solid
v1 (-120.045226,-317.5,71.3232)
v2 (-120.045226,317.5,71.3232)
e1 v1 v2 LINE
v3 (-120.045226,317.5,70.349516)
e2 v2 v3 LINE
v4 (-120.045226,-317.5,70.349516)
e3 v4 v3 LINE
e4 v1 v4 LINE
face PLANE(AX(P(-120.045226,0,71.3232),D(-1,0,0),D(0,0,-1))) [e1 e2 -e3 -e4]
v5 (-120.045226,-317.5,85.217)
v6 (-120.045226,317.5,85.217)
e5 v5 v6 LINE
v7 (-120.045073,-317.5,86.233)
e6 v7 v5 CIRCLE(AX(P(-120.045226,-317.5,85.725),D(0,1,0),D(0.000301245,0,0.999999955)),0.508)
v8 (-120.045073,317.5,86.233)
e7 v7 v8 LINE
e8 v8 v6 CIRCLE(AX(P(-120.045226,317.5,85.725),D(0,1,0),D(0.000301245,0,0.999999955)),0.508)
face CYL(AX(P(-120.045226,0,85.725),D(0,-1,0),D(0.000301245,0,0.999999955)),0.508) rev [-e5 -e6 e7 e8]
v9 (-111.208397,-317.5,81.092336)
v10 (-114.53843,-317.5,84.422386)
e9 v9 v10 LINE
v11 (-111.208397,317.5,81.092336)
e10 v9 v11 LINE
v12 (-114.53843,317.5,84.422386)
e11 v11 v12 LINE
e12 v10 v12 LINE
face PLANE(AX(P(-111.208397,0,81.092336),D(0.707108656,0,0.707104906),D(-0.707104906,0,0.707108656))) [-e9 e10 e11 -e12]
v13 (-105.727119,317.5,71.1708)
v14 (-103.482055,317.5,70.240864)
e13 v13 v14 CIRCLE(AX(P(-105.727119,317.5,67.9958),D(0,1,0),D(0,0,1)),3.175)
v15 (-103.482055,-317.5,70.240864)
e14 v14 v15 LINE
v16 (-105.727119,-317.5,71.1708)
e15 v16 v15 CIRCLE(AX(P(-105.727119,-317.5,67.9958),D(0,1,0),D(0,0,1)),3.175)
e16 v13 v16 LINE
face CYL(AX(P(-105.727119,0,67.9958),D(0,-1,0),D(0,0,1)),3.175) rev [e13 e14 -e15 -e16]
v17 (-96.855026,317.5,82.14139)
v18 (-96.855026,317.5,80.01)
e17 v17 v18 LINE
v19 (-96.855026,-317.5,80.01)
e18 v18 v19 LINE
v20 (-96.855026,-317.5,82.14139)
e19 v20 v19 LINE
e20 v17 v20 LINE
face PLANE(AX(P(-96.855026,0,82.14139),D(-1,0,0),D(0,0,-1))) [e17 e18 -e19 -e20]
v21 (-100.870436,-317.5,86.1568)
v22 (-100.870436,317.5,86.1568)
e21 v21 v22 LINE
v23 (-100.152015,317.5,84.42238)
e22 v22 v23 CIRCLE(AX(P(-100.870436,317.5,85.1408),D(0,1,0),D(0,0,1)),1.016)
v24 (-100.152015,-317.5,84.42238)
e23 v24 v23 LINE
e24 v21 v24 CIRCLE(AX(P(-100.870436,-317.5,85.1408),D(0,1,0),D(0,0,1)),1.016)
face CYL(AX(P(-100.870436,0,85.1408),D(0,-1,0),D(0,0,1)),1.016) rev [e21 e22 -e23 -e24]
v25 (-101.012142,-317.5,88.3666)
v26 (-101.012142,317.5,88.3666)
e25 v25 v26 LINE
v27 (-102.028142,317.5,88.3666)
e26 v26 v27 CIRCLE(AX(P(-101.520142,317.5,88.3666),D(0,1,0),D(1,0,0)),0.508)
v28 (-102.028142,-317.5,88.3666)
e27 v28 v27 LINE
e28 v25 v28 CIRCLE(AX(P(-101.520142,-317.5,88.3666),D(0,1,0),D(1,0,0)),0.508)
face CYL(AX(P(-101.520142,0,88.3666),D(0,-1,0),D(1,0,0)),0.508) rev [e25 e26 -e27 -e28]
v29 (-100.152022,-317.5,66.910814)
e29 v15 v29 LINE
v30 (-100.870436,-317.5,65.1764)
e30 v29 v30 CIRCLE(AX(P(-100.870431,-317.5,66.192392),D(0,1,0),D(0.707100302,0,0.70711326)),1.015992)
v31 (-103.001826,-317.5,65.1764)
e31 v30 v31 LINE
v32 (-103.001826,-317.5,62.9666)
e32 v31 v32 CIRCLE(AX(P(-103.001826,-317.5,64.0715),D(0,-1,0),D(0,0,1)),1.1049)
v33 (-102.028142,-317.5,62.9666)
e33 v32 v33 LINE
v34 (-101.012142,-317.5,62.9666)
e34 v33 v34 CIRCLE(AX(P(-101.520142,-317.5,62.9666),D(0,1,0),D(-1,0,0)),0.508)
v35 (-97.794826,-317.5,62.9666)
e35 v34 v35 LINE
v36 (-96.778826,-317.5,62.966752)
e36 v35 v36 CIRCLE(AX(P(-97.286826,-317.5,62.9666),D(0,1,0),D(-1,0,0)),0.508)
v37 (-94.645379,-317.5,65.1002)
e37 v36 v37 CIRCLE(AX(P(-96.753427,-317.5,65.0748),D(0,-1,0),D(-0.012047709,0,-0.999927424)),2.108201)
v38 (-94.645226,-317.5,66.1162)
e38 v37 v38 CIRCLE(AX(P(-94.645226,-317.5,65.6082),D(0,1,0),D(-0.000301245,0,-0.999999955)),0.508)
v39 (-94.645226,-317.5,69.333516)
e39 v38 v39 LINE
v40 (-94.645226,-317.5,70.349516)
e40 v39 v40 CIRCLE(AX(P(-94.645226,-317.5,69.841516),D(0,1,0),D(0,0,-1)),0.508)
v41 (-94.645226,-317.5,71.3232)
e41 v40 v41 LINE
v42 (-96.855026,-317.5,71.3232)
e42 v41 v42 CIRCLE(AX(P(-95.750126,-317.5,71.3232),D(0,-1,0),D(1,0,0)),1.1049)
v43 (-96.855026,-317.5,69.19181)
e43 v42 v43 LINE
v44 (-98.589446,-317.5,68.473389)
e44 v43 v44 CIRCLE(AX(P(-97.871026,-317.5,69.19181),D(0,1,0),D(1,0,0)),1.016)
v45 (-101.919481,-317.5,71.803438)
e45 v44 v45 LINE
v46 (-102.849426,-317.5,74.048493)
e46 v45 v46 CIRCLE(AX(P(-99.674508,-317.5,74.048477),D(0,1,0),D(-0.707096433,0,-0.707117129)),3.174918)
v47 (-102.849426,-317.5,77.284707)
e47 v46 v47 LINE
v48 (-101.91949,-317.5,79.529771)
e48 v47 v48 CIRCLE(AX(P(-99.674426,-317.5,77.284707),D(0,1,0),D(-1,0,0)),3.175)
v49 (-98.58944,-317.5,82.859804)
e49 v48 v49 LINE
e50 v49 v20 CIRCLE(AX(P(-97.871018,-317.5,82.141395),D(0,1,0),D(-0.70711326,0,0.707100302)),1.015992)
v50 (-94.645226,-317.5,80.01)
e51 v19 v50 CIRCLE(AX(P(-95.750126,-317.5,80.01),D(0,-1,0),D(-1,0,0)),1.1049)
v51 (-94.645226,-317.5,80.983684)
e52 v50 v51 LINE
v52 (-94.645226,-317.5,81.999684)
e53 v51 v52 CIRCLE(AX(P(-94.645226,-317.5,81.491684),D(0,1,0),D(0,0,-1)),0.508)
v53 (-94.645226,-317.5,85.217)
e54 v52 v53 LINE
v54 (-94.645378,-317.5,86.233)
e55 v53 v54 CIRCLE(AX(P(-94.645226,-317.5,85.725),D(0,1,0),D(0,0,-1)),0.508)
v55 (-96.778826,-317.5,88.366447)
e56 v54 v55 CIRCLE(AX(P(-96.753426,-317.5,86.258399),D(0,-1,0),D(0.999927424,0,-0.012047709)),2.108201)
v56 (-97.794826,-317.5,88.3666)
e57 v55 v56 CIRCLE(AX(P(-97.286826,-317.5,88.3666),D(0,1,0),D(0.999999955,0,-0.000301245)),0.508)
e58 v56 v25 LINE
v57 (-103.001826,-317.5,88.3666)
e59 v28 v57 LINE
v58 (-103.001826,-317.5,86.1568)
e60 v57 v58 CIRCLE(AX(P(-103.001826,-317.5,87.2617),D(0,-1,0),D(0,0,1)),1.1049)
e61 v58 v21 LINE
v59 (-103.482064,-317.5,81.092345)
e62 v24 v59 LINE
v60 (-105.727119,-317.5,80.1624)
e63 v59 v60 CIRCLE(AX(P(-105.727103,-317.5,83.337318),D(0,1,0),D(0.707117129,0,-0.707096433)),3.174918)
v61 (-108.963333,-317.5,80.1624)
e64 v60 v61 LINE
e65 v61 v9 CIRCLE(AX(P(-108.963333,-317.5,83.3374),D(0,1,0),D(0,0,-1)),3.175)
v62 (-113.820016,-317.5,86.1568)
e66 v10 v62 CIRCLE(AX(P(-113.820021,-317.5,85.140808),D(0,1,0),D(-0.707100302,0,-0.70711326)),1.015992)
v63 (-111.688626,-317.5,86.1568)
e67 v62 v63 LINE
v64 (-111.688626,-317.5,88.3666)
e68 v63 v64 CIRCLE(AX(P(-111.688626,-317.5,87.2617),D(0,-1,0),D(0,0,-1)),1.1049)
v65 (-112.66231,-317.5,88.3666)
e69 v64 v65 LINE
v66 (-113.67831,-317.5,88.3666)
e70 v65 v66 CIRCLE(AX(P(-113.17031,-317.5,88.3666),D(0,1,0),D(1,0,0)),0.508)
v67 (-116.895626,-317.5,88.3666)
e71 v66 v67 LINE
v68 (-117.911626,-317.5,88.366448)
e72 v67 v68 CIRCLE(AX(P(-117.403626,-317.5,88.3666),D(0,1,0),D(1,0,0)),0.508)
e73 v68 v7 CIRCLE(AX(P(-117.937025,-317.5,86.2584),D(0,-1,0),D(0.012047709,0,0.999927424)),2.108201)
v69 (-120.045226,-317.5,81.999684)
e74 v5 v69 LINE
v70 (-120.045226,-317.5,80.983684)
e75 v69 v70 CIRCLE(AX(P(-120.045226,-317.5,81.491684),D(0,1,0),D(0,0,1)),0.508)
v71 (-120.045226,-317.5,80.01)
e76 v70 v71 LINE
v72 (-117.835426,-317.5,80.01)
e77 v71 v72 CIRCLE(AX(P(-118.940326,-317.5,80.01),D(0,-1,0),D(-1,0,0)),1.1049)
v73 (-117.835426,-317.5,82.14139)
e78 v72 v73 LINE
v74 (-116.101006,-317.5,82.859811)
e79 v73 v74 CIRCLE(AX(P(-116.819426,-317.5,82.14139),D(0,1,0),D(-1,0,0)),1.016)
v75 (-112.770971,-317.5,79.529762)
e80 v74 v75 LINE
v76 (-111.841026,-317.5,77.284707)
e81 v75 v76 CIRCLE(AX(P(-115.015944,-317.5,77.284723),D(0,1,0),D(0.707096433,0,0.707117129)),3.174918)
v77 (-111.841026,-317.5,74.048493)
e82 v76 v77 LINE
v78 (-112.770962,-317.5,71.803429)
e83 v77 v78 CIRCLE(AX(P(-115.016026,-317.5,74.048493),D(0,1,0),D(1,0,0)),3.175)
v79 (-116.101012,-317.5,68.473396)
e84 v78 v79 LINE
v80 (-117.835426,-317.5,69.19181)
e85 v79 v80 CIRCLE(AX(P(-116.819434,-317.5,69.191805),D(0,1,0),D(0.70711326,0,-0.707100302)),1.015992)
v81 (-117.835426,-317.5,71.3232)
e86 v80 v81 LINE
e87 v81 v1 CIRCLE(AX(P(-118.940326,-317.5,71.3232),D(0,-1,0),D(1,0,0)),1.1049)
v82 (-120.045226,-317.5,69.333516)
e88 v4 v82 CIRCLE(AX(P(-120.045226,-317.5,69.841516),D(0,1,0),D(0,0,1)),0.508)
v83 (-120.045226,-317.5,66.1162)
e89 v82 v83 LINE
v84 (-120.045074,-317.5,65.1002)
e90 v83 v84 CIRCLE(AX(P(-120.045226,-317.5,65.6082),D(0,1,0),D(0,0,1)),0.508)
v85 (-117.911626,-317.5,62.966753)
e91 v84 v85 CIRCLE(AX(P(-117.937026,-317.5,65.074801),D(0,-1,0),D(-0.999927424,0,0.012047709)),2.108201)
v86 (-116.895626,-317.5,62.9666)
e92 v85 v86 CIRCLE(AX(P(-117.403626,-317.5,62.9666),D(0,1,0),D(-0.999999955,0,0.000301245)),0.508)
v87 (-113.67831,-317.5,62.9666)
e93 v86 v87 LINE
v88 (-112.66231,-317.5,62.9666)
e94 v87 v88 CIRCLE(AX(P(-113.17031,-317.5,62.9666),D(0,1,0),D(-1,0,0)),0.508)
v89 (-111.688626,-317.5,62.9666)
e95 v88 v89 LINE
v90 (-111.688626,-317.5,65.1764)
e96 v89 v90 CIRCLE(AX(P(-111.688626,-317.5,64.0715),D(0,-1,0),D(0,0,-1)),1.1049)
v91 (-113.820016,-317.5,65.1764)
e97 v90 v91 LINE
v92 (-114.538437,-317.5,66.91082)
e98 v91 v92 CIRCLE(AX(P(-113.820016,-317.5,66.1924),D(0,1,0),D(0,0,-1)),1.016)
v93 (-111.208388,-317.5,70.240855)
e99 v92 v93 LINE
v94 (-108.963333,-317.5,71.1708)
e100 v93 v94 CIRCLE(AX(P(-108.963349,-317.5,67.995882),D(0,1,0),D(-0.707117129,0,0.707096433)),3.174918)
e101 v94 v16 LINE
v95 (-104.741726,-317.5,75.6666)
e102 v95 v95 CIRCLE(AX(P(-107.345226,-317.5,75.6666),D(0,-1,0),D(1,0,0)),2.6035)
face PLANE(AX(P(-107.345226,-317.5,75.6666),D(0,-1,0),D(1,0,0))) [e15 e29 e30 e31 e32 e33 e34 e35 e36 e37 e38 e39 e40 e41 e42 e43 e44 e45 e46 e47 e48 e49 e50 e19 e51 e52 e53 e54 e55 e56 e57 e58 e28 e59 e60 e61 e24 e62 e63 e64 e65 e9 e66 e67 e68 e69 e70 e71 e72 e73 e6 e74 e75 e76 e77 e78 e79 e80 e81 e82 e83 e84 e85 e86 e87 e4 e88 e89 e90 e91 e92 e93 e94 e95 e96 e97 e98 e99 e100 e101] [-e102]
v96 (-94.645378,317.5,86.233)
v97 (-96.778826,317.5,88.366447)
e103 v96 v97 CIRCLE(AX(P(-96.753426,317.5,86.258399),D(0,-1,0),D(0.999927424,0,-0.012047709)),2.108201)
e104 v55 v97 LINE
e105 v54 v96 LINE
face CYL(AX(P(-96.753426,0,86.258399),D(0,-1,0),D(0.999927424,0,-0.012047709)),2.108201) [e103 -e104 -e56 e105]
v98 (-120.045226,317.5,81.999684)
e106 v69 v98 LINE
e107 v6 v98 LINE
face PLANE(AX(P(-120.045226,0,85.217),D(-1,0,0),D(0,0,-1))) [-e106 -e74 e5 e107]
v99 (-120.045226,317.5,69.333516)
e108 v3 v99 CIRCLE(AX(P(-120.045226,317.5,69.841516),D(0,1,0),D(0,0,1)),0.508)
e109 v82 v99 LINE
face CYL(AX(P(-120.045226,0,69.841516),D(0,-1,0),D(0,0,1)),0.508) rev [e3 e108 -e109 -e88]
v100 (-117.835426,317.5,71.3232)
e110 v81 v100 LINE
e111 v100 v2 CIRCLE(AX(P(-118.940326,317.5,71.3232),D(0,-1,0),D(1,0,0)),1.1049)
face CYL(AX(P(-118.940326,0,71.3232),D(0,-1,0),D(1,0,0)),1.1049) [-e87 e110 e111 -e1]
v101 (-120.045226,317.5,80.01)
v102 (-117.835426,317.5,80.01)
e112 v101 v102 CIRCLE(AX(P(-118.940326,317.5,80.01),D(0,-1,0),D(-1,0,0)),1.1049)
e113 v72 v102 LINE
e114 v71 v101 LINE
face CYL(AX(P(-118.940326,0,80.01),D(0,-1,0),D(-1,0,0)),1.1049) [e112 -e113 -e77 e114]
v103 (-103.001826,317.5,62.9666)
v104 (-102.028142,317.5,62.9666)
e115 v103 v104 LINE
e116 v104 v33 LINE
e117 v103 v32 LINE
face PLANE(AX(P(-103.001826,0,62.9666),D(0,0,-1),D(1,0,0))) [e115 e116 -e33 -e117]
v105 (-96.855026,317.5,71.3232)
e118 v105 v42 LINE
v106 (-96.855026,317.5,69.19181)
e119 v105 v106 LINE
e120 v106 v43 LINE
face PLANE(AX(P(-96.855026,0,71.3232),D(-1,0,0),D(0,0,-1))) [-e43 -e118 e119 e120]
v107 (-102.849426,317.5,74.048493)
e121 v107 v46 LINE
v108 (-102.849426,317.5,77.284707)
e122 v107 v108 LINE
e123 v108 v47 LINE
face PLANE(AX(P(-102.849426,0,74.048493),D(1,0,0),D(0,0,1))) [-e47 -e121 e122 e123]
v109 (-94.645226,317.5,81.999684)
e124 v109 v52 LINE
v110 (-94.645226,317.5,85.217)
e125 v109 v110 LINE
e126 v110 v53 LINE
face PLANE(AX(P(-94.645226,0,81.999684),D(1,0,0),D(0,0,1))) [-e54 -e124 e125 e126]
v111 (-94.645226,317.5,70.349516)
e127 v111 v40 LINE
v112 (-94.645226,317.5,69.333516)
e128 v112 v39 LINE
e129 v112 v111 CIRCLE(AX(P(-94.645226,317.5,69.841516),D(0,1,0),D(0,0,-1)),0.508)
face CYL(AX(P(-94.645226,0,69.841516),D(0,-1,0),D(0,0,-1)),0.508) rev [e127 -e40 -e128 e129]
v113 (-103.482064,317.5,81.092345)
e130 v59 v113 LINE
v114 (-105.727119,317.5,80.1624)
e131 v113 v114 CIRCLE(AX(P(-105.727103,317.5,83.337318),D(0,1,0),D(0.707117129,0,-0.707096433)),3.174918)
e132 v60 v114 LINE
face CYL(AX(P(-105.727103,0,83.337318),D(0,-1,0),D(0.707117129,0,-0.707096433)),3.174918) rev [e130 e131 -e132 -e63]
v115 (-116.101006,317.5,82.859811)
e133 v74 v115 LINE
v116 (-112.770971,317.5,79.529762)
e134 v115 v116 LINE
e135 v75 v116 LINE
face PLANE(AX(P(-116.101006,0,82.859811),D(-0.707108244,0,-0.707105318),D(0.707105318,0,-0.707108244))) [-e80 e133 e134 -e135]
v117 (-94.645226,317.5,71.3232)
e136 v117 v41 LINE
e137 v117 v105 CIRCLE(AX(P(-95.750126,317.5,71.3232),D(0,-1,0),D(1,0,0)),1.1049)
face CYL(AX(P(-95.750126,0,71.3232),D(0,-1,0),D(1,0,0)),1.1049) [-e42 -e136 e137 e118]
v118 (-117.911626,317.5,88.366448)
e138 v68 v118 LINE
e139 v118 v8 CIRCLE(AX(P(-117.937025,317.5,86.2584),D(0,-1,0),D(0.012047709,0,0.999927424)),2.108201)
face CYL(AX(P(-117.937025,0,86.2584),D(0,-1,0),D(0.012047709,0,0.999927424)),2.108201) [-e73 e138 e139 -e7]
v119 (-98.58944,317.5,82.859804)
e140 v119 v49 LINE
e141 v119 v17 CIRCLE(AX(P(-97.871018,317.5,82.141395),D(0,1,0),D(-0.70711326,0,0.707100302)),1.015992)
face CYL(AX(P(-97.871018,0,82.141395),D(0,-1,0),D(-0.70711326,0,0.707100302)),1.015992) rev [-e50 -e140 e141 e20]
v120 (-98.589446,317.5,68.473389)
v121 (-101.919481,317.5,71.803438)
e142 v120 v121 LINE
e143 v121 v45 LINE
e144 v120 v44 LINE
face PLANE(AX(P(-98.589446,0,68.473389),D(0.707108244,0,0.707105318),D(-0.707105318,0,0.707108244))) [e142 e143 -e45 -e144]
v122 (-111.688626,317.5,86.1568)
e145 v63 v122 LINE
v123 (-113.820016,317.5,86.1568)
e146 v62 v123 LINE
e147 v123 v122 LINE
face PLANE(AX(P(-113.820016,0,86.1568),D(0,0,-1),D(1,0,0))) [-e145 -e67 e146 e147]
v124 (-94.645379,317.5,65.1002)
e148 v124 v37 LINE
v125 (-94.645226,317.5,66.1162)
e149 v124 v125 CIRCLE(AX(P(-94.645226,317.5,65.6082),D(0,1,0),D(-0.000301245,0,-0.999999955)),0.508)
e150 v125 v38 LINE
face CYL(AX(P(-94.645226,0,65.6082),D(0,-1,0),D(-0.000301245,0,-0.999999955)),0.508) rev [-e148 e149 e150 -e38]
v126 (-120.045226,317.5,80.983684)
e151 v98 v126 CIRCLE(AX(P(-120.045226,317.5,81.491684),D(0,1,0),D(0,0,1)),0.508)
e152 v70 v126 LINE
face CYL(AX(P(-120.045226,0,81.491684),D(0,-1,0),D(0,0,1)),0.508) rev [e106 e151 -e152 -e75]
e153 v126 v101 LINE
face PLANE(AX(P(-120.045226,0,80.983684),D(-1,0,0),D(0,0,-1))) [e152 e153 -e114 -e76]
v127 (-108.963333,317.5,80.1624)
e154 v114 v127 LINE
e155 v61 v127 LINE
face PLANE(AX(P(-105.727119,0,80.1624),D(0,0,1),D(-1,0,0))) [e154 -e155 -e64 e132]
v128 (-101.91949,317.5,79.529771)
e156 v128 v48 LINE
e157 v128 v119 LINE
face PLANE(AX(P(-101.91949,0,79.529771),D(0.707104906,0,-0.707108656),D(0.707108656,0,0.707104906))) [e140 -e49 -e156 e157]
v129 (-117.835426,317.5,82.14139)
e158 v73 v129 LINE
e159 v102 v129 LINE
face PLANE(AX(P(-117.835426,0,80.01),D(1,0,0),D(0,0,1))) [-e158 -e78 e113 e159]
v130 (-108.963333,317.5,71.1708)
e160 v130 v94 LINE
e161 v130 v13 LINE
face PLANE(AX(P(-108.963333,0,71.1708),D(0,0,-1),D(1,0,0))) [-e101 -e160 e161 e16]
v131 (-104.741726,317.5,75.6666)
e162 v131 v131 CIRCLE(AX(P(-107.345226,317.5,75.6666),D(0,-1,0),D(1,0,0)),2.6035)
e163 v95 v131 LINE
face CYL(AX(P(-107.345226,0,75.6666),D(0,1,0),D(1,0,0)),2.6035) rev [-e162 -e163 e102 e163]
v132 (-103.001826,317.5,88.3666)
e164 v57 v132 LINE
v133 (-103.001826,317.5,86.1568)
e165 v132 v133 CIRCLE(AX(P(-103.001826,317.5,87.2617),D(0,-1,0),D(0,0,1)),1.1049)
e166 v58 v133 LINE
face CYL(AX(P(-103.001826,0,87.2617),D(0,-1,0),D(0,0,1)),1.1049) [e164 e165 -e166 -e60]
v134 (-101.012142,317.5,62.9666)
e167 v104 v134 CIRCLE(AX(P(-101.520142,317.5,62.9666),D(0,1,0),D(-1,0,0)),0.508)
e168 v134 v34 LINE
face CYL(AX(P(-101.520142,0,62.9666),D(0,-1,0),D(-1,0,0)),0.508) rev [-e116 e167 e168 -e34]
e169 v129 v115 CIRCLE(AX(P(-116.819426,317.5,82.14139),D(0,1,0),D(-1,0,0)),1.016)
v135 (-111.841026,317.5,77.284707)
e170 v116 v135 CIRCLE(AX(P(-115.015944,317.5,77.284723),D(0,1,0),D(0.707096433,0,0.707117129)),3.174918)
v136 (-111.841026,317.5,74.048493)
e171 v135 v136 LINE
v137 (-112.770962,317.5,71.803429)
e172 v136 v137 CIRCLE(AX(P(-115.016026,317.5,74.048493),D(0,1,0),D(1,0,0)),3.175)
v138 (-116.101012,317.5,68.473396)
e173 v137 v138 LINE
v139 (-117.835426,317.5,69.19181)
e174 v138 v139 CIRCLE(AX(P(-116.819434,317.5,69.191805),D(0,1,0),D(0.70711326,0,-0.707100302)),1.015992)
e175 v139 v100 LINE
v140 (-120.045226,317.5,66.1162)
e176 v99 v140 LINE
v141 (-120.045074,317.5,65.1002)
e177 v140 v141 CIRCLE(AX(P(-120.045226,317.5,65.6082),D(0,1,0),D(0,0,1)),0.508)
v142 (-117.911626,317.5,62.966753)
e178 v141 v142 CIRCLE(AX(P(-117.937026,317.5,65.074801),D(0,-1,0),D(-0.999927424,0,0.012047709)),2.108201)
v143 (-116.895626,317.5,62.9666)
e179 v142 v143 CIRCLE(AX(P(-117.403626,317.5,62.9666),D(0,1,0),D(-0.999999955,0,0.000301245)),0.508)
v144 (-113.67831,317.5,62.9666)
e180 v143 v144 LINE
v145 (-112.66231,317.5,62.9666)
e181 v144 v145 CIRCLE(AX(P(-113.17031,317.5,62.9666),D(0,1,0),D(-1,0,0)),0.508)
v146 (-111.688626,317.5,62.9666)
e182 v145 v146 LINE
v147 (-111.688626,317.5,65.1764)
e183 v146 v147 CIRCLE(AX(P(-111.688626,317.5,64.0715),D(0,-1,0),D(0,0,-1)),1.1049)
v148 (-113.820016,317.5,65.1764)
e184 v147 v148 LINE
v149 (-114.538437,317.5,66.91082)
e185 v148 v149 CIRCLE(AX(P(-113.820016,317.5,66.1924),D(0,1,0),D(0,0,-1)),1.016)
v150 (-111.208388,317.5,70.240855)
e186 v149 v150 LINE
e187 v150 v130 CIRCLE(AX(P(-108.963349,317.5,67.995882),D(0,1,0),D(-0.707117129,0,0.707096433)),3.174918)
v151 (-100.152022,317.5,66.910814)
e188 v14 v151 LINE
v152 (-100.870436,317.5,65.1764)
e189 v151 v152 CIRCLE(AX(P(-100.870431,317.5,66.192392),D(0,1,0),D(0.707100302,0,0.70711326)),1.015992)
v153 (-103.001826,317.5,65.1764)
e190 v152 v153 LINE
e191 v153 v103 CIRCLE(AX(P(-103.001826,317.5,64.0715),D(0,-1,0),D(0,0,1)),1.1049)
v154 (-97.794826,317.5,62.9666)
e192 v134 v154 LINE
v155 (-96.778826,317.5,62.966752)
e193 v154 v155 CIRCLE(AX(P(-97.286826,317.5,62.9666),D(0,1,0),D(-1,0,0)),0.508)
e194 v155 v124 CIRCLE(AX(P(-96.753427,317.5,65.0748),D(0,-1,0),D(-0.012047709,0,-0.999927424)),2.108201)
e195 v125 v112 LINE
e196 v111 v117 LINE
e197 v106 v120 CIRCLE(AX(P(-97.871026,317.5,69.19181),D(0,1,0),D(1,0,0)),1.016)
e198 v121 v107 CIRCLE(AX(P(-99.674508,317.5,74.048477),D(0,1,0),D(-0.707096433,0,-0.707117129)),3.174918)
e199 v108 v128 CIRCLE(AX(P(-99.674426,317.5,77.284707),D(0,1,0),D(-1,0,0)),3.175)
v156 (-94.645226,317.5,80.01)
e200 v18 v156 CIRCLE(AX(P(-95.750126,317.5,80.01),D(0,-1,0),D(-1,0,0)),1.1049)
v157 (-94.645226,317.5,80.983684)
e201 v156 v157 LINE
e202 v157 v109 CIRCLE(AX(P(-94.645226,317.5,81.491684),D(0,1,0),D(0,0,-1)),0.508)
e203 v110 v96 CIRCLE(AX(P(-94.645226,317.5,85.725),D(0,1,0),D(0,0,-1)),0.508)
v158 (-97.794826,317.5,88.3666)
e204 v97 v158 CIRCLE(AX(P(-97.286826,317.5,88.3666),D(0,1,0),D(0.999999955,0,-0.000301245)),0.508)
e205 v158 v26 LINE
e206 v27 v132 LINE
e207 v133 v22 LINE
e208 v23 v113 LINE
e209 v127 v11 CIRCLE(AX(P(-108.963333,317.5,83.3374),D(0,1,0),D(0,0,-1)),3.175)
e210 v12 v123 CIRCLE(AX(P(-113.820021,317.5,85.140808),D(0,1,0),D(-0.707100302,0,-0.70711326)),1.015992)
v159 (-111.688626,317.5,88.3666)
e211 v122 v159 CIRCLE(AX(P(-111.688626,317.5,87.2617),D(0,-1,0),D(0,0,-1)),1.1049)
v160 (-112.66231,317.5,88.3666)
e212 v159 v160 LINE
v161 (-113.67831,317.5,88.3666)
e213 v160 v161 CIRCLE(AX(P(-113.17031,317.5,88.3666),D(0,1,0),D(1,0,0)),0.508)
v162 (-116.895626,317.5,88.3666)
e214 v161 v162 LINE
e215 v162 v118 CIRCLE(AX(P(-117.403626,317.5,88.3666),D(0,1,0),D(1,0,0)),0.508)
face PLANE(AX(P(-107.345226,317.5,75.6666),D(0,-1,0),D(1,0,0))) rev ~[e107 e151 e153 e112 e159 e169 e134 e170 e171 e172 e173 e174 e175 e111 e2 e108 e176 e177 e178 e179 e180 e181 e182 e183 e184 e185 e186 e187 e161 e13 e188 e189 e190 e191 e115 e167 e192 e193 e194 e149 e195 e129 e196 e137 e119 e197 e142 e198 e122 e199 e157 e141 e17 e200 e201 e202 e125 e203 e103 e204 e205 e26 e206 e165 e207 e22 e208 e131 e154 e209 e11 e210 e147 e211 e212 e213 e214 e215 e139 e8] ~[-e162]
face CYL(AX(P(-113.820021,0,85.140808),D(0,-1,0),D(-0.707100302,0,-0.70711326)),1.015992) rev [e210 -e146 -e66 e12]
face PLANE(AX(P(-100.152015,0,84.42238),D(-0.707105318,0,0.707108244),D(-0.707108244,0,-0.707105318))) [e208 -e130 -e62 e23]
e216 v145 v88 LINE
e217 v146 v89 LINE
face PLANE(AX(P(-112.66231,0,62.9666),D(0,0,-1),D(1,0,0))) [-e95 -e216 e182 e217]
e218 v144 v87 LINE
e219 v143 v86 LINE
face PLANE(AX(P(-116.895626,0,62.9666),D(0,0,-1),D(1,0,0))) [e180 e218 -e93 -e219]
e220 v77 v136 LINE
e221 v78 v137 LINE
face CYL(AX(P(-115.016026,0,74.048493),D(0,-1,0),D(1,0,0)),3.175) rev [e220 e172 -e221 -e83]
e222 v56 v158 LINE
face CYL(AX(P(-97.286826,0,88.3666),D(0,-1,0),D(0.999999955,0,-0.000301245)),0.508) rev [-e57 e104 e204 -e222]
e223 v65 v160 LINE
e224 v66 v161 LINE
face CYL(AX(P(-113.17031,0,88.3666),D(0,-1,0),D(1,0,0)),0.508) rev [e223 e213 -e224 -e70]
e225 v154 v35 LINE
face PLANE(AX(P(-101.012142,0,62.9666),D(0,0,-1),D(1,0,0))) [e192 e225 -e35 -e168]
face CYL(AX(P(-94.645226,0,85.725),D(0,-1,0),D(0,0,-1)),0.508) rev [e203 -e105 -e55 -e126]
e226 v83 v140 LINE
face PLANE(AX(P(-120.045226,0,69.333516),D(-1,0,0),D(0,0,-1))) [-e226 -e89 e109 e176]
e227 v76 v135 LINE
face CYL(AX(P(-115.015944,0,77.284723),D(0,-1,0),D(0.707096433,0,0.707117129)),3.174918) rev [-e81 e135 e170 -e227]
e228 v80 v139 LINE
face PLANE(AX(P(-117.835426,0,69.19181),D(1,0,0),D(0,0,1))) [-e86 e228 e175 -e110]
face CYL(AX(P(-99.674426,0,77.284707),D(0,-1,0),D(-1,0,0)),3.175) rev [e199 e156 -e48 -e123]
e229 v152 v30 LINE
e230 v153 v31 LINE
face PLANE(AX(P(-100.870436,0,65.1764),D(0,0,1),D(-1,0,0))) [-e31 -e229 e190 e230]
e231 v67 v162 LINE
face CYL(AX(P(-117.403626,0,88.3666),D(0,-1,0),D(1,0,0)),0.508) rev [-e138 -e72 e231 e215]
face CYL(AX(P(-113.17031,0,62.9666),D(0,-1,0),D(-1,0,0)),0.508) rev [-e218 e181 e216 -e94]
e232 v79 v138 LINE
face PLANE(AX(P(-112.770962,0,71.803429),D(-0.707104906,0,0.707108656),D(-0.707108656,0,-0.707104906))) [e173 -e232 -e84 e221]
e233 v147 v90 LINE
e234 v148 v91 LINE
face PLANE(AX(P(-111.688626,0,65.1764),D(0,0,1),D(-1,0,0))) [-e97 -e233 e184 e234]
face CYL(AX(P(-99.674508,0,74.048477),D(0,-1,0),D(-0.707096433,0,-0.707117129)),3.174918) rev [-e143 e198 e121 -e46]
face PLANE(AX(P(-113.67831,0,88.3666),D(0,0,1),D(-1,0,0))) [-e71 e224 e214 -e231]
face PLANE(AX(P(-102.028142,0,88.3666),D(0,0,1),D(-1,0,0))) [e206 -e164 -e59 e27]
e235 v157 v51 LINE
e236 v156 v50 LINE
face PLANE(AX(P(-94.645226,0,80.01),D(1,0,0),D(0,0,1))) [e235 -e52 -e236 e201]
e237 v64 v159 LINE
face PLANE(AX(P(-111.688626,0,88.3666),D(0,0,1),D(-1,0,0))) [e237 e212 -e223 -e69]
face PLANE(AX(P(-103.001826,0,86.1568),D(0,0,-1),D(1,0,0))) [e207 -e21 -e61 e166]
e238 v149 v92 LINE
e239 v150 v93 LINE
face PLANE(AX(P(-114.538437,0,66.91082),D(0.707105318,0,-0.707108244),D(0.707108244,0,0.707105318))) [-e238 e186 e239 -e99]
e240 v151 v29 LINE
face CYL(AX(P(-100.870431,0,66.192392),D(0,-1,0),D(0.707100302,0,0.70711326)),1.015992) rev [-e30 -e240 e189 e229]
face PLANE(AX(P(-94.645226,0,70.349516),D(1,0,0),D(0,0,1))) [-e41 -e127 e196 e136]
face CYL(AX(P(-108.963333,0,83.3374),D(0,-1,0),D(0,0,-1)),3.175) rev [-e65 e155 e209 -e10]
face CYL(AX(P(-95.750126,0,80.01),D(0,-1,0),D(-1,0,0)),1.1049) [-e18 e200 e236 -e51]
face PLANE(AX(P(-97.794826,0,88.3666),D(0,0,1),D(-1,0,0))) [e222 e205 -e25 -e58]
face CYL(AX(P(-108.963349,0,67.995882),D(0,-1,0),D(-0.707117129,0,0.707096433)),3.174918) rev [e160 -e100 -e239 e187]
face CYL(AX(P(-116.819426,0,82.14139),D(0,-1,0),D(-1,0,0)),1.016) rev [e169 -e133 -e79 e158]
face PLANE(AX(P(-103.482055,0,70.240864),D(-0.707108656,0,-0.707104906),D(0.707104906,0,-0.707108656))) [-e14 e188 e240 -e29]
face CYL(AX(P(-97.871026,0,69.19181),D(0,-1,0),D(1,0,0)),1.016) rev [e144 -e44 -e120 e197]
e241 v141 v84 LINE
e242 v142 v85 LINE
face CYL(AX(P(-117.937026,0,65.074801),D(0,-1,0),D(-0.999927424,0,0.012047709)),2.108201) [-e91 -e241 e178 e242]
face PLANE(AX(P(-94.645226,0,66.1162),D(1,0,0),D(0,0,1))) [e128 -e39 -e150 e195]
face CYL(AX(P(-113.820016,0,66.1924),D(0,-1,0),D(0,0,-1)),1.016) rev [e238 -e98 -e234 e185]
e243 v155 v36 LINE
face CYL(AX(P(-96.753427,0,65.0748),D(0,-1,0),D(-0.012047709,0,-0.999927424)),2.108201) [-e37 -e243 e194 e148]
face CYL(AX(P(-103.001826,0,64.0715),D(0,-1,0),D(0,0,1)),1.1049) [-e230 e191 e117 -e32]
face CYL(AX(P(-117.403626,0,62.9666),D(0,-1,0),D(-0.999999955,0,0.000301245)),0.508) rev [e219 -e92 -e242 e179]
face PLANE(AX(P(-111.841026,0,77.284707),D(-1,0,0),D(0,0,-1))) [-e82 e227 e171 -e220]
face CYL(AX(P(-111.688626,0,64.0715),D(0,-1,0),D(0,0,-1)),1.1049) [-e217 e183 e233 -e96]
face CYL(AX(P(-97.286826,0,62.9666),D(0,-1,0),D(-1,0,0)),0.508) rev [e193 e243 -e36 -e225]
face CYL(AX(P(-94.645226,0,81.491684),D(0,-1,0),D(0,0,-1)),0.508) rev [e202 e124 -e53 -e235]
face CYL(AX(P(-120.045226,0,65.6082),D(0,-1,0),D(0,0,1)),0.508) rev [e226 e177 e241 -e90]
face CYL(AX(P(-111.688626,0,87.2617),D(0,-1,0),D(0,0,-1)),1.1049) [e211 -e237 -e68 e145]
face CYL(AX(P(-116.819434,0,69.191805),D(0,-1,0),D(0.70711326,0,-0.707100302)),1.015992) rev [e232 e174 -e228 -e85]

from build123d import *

# Parameters (mm, degrees)
F0_R     = 2.6035
F1_DEPTH = 317.5


# Not quite as in the source:
# - ends of sketch curves that miss each other by under 0.0002 mm in the source are joined


with BuildPart() as f1:
    # F0 (on Front) → F1 (new body, symmetric)
    with BuildSketch(Plane.XZ):
        with BuildLine():
            ThreePointArc((-120.045226, 66.1162), (-119.5372260057, 65.6082762), (-120.0450736, 65.1002000229))
            ThreePointArc((-120.0450736, 65.1002000229), (-119.4277485161, 63.5840774839), (-117.9116260074, 62.9667530175))
            ThreePointArc((-117.9116260074, 62.9667530175), (-117.4035498, 63.4745999943), (-116.895626, 62.9666))
            Line((-116.895626, 62.9666), (-113.6783096, 62.9666))
            ThreePointArc((-113.6783096, 62.9666), (-113.1703096, 63.4746), (-112.6623096, 62.9666))
            Line((-112.6623096, 62.9666), (-111.688626, 62.9666))
            ThreePointArc((-111.688626, 62.9666), (-110.583726, 64.0715), (-111.688626, 65.1764))
            Line((-111.688626, 65.1764), (-113.8200162, 65.1764))
            ThreePointArc((-113.8200162, 65.1764), (-114.758677805, 65.8035936327), (-114.5384366897, 66.9108204897))
            Line((-114.5384366897, 66.9108204897), (-111.2083882, 70.2408552))
            ThreePointArc((-111.2083882, 70.2408552), (-110.1783528978, 70.9291175157), (-108.963333, 71.1708))
            Line((-108.963333, 71.1708), (-105.727119, 71.1708))
            ThreePointArc((-105.727119, 71.1708), (-104.5120991022, 70.9291175157), (-103.4820549697, 70.2408640303))
            Line((-103.4820549697, 70.2408640303), (-100.1520222, 66.9108136))
            ThreePointArc((-100.1520222, 66.9108136), (-99.931774195, 65.8035936327), (-100.8704358, 65.1764))
            Line((-100.8704358, 65.1764), (-103.001826, 65.1764))
            ThreePointArc((-103.001826, 65.1764), (-104.106726, 64.0715), (-103.001826, 62.9666))
            Line((-103.001826, 62.9666), (-102.0281424, 62.9666))
            ThreePointArc((-102.0281424, 62.9666), (-101.5201424, 63.4746), (-101.0121424, 62.9666))
            Line((-101.0121424, 62.9666), (-97.794826, 62.9666))
            ThreePointArc((-97.794826, 62.9666), (-97.2869022, 63.4745999943), (-96.7788260229, 62.9667524))
            ThreePointArc((-96.7788260229, 62.9667524), (-95.2627034839, 63.5840774839), (-94.6453790175, 65.1001999926))
            ThreePointArc((-94.6453790175, 65.1001999926), (-95.1532259943, 65.6082762), (-94.645226, 66.1162))
            Line((-94.645226, 66.1162), (-94.645226, 69.3335164))
            ThreePointArc((-94.645226, 69.3335164), (-95.153226, 69.8415164), (-94.645226, 70.3495164))
            Line((-94.645226, 70.3495164), (-94.645226, 71.3232))
            ThreePointArc((-94.645226, 71.3232), (-95.750126, 72.4281), (-96.855026, 71.3232))
            Line((-96.855026, 71.3232), (-96.855026, 69.1918098))
            ThreePointArc((-96.855026, 69.1918098), (-97.4822196327, 68.253148195), (-98.5894464897, 68.4733893103))
            Line((-98.5894464897, 68.4733893103), (-101.9194812, 71.8034378))
            ThreePointArc((-101.9194812, 71.8034378), (-102.6077435157, 72.8334731022), (-102.849426, 74.048493))
            Line((-102.849426, 74.048493), (-102.849426, 77.284707))
            ThreePointArc((-102.849426, 77.284707), (-102.6077435157, 78.4997268978), (-101.9194900303, 79.5297710303))
            Line((-101.9194900303, 79.5297710303), (-98.5894396, 82.8598038))
            ThreePointArc((-98.5894396, 82.8598038), (-97.4822196327, 83.080051805), (-96.855026, 82.1413902))
            Line((-96.855026, 82.1413902), (-96.855026, 80.01))
            ThreePointArc((-96.855026, 80.01), (-95.750126, 78.9051), (-94.645226, 80.01))
            Line((-94.645226, 80.01), (-94.645226, 80.9836836))
            ThreePointArc((-94.645226, 80.9836836), (-95.153226, 81.4916836), (-94.645226, 81.9996836))
            Line((-94.645226, 81.9996836), (-94.645226, 85.217))
            ThreePointArc((-94.645226, 85.217), (-95.1532259943, 85.7249238), (-94.6453784, 86.2329999771))
            ThreePointArc((-94.6453784, 86.2329999771), (-95.2627034839, 87.7491225161), (-96.7788259926, 88.3664469825))
            ThreePointArc((-96.7788259926, 88.3664469825), (-97.2869022, 87.8586000057), (-97.794826, 88.3666))
            Line((-97.794826, 88.3666), (-101.0121424, 88.3666))
            ThreePointArc((-101.0121424, 88.3666), (-101.5201424, 87.8586), (-102.0281424, 88.3666))
            Line((-102.0281424, 88.3666), (-103.001826, 88.3666))
            ThreePointArc((-103.001826, 88.3666), (-104.106726, 87.2617), (-103.001826, 86.1568))
            Line((-103.001826, 86.1568), (-100.8704358, 86.1568))
            ThreePointArc((-100.8704358, 86.1568), (-99.931774195, 85.5296063673), (-100.1520153103, 84.4223795103))
            Line((-100.1520153103, 84.4223795103), (-103.4820638, 81.0923448))
            ThreePointArc((-103.4820638, 81.0923448), (-104.5120991022, 80.4040824843), (-105.727119, 80.1624))
            Line((-105.727119, 80.1624), (-108.963333, 80.1624))
            ThreePointArc((-108.963333, 80.1624), (-110.1783528978, 80.4040824843), (-111.2083970303, 81.0923359697))
            Line((-111.2083970303, 81.0923359697), (-114.5384298, 84.4223864))
            ThreePointArc((-114.5384298, 84.4223864), (-114.758677805, 85.5296063673), (-113.8200162, 86.1568))
            Line((-113.8200162, 86.1568), (-111.688626, 86.1568))
            ThreePointArc((-111.688626, 86.1568), (-110.583726, 87.2617), (-111.688626, 88.3666))
            Line((-111.688626, 88.3666), (-112.6623096, 88.3666))
            ThreePointArc((-112.6623096, 88.3666), (-113.1703096, 87.8586), (-113.6783096, 88.3666))
            Line((-113.6783096, 88.3666), (-116.895626, 88.3666))
            ThreePointArc((-116.895626, 88.3666), (-117.4035498, 87.8586000057), (-117.9116259771, 88.3664476))
            ThreePointArc((-117.9116259771, 88.3664476), (-119.4277485161, 87.7491225161), (-120.0450729825, 86.2330000074))
            ThreePointArc((-120.0450729825, 86.2330000074), (-119.5372260057, 85.7249238), (-120.045226, 85.217))
            Line((-120.045226, 85.217), (-120.045226, 81.9996836))
            ThreePointArc((-120.045226, 81.9996836), (-119.537226, 81.4916836), (-120.045226, 80.9836836))
            Line((-120.045226, 80.9836836), (-120.045226, 80.01))
            ThreePointArc((-120.045226, 80.01), (-118.940326, 78.9051), (-117.835426, 80.01))
            Line((-117.835426, 80.01), (-117.835426, 82.1413902))
            ThreePointArc((-117.835426, 82.1413902), (-117.2082323673, 83.080051805), (-116.1010055103, 82.8598106897))
            Line((-116.1010055103, 82.8598106897), (-112.7709708, 79.5297622))
            ThreePointArc((-112.7709708, 79.5297622), (-112.0827084843, 78.4997268978), (-111.841026, 77.284707))
            Line((-111.841026, 77.284707), (-111.841026, 74.048493))
            ThreePointArc((-111.841026, 74.048493), (-112.0827084843, 72.8334731022), (-112.7709619697, 71.8034289697))
            Line((-112.7709619697, 71.8034289697), (-116.1010124, 68.4733962))
            ThreePointArc((-116.1010124, 68.4733962), (-117.2082323673, 68.253148195), (-117.835426, 69.1918098))
            Line((-117.835426, 69.1918098), (-117.835426, 71.3232))
            ThreePointArc((-117.835426, 71.3232), (-118.940326, 72.4281), (-120.045226, 71.3232))
            Line((-120.045226, 71.3232), (-120.045226, 70.3495164))
            ThreePointArc((-120.045226, 70.3495164), (-119.537226, 69.8415164), (-120.045226, 69.3335164))
            Line((-120.045226, 69.3335164), (-120.045226, 66.1162))
        make_face()
        with Locations((-107.345226, 75.6666)):
            Circle(F0_R, mode=Mode.SUBTRACT)
    extrude(amount=F1_DEPTH, both=True)


solid = f1.part
